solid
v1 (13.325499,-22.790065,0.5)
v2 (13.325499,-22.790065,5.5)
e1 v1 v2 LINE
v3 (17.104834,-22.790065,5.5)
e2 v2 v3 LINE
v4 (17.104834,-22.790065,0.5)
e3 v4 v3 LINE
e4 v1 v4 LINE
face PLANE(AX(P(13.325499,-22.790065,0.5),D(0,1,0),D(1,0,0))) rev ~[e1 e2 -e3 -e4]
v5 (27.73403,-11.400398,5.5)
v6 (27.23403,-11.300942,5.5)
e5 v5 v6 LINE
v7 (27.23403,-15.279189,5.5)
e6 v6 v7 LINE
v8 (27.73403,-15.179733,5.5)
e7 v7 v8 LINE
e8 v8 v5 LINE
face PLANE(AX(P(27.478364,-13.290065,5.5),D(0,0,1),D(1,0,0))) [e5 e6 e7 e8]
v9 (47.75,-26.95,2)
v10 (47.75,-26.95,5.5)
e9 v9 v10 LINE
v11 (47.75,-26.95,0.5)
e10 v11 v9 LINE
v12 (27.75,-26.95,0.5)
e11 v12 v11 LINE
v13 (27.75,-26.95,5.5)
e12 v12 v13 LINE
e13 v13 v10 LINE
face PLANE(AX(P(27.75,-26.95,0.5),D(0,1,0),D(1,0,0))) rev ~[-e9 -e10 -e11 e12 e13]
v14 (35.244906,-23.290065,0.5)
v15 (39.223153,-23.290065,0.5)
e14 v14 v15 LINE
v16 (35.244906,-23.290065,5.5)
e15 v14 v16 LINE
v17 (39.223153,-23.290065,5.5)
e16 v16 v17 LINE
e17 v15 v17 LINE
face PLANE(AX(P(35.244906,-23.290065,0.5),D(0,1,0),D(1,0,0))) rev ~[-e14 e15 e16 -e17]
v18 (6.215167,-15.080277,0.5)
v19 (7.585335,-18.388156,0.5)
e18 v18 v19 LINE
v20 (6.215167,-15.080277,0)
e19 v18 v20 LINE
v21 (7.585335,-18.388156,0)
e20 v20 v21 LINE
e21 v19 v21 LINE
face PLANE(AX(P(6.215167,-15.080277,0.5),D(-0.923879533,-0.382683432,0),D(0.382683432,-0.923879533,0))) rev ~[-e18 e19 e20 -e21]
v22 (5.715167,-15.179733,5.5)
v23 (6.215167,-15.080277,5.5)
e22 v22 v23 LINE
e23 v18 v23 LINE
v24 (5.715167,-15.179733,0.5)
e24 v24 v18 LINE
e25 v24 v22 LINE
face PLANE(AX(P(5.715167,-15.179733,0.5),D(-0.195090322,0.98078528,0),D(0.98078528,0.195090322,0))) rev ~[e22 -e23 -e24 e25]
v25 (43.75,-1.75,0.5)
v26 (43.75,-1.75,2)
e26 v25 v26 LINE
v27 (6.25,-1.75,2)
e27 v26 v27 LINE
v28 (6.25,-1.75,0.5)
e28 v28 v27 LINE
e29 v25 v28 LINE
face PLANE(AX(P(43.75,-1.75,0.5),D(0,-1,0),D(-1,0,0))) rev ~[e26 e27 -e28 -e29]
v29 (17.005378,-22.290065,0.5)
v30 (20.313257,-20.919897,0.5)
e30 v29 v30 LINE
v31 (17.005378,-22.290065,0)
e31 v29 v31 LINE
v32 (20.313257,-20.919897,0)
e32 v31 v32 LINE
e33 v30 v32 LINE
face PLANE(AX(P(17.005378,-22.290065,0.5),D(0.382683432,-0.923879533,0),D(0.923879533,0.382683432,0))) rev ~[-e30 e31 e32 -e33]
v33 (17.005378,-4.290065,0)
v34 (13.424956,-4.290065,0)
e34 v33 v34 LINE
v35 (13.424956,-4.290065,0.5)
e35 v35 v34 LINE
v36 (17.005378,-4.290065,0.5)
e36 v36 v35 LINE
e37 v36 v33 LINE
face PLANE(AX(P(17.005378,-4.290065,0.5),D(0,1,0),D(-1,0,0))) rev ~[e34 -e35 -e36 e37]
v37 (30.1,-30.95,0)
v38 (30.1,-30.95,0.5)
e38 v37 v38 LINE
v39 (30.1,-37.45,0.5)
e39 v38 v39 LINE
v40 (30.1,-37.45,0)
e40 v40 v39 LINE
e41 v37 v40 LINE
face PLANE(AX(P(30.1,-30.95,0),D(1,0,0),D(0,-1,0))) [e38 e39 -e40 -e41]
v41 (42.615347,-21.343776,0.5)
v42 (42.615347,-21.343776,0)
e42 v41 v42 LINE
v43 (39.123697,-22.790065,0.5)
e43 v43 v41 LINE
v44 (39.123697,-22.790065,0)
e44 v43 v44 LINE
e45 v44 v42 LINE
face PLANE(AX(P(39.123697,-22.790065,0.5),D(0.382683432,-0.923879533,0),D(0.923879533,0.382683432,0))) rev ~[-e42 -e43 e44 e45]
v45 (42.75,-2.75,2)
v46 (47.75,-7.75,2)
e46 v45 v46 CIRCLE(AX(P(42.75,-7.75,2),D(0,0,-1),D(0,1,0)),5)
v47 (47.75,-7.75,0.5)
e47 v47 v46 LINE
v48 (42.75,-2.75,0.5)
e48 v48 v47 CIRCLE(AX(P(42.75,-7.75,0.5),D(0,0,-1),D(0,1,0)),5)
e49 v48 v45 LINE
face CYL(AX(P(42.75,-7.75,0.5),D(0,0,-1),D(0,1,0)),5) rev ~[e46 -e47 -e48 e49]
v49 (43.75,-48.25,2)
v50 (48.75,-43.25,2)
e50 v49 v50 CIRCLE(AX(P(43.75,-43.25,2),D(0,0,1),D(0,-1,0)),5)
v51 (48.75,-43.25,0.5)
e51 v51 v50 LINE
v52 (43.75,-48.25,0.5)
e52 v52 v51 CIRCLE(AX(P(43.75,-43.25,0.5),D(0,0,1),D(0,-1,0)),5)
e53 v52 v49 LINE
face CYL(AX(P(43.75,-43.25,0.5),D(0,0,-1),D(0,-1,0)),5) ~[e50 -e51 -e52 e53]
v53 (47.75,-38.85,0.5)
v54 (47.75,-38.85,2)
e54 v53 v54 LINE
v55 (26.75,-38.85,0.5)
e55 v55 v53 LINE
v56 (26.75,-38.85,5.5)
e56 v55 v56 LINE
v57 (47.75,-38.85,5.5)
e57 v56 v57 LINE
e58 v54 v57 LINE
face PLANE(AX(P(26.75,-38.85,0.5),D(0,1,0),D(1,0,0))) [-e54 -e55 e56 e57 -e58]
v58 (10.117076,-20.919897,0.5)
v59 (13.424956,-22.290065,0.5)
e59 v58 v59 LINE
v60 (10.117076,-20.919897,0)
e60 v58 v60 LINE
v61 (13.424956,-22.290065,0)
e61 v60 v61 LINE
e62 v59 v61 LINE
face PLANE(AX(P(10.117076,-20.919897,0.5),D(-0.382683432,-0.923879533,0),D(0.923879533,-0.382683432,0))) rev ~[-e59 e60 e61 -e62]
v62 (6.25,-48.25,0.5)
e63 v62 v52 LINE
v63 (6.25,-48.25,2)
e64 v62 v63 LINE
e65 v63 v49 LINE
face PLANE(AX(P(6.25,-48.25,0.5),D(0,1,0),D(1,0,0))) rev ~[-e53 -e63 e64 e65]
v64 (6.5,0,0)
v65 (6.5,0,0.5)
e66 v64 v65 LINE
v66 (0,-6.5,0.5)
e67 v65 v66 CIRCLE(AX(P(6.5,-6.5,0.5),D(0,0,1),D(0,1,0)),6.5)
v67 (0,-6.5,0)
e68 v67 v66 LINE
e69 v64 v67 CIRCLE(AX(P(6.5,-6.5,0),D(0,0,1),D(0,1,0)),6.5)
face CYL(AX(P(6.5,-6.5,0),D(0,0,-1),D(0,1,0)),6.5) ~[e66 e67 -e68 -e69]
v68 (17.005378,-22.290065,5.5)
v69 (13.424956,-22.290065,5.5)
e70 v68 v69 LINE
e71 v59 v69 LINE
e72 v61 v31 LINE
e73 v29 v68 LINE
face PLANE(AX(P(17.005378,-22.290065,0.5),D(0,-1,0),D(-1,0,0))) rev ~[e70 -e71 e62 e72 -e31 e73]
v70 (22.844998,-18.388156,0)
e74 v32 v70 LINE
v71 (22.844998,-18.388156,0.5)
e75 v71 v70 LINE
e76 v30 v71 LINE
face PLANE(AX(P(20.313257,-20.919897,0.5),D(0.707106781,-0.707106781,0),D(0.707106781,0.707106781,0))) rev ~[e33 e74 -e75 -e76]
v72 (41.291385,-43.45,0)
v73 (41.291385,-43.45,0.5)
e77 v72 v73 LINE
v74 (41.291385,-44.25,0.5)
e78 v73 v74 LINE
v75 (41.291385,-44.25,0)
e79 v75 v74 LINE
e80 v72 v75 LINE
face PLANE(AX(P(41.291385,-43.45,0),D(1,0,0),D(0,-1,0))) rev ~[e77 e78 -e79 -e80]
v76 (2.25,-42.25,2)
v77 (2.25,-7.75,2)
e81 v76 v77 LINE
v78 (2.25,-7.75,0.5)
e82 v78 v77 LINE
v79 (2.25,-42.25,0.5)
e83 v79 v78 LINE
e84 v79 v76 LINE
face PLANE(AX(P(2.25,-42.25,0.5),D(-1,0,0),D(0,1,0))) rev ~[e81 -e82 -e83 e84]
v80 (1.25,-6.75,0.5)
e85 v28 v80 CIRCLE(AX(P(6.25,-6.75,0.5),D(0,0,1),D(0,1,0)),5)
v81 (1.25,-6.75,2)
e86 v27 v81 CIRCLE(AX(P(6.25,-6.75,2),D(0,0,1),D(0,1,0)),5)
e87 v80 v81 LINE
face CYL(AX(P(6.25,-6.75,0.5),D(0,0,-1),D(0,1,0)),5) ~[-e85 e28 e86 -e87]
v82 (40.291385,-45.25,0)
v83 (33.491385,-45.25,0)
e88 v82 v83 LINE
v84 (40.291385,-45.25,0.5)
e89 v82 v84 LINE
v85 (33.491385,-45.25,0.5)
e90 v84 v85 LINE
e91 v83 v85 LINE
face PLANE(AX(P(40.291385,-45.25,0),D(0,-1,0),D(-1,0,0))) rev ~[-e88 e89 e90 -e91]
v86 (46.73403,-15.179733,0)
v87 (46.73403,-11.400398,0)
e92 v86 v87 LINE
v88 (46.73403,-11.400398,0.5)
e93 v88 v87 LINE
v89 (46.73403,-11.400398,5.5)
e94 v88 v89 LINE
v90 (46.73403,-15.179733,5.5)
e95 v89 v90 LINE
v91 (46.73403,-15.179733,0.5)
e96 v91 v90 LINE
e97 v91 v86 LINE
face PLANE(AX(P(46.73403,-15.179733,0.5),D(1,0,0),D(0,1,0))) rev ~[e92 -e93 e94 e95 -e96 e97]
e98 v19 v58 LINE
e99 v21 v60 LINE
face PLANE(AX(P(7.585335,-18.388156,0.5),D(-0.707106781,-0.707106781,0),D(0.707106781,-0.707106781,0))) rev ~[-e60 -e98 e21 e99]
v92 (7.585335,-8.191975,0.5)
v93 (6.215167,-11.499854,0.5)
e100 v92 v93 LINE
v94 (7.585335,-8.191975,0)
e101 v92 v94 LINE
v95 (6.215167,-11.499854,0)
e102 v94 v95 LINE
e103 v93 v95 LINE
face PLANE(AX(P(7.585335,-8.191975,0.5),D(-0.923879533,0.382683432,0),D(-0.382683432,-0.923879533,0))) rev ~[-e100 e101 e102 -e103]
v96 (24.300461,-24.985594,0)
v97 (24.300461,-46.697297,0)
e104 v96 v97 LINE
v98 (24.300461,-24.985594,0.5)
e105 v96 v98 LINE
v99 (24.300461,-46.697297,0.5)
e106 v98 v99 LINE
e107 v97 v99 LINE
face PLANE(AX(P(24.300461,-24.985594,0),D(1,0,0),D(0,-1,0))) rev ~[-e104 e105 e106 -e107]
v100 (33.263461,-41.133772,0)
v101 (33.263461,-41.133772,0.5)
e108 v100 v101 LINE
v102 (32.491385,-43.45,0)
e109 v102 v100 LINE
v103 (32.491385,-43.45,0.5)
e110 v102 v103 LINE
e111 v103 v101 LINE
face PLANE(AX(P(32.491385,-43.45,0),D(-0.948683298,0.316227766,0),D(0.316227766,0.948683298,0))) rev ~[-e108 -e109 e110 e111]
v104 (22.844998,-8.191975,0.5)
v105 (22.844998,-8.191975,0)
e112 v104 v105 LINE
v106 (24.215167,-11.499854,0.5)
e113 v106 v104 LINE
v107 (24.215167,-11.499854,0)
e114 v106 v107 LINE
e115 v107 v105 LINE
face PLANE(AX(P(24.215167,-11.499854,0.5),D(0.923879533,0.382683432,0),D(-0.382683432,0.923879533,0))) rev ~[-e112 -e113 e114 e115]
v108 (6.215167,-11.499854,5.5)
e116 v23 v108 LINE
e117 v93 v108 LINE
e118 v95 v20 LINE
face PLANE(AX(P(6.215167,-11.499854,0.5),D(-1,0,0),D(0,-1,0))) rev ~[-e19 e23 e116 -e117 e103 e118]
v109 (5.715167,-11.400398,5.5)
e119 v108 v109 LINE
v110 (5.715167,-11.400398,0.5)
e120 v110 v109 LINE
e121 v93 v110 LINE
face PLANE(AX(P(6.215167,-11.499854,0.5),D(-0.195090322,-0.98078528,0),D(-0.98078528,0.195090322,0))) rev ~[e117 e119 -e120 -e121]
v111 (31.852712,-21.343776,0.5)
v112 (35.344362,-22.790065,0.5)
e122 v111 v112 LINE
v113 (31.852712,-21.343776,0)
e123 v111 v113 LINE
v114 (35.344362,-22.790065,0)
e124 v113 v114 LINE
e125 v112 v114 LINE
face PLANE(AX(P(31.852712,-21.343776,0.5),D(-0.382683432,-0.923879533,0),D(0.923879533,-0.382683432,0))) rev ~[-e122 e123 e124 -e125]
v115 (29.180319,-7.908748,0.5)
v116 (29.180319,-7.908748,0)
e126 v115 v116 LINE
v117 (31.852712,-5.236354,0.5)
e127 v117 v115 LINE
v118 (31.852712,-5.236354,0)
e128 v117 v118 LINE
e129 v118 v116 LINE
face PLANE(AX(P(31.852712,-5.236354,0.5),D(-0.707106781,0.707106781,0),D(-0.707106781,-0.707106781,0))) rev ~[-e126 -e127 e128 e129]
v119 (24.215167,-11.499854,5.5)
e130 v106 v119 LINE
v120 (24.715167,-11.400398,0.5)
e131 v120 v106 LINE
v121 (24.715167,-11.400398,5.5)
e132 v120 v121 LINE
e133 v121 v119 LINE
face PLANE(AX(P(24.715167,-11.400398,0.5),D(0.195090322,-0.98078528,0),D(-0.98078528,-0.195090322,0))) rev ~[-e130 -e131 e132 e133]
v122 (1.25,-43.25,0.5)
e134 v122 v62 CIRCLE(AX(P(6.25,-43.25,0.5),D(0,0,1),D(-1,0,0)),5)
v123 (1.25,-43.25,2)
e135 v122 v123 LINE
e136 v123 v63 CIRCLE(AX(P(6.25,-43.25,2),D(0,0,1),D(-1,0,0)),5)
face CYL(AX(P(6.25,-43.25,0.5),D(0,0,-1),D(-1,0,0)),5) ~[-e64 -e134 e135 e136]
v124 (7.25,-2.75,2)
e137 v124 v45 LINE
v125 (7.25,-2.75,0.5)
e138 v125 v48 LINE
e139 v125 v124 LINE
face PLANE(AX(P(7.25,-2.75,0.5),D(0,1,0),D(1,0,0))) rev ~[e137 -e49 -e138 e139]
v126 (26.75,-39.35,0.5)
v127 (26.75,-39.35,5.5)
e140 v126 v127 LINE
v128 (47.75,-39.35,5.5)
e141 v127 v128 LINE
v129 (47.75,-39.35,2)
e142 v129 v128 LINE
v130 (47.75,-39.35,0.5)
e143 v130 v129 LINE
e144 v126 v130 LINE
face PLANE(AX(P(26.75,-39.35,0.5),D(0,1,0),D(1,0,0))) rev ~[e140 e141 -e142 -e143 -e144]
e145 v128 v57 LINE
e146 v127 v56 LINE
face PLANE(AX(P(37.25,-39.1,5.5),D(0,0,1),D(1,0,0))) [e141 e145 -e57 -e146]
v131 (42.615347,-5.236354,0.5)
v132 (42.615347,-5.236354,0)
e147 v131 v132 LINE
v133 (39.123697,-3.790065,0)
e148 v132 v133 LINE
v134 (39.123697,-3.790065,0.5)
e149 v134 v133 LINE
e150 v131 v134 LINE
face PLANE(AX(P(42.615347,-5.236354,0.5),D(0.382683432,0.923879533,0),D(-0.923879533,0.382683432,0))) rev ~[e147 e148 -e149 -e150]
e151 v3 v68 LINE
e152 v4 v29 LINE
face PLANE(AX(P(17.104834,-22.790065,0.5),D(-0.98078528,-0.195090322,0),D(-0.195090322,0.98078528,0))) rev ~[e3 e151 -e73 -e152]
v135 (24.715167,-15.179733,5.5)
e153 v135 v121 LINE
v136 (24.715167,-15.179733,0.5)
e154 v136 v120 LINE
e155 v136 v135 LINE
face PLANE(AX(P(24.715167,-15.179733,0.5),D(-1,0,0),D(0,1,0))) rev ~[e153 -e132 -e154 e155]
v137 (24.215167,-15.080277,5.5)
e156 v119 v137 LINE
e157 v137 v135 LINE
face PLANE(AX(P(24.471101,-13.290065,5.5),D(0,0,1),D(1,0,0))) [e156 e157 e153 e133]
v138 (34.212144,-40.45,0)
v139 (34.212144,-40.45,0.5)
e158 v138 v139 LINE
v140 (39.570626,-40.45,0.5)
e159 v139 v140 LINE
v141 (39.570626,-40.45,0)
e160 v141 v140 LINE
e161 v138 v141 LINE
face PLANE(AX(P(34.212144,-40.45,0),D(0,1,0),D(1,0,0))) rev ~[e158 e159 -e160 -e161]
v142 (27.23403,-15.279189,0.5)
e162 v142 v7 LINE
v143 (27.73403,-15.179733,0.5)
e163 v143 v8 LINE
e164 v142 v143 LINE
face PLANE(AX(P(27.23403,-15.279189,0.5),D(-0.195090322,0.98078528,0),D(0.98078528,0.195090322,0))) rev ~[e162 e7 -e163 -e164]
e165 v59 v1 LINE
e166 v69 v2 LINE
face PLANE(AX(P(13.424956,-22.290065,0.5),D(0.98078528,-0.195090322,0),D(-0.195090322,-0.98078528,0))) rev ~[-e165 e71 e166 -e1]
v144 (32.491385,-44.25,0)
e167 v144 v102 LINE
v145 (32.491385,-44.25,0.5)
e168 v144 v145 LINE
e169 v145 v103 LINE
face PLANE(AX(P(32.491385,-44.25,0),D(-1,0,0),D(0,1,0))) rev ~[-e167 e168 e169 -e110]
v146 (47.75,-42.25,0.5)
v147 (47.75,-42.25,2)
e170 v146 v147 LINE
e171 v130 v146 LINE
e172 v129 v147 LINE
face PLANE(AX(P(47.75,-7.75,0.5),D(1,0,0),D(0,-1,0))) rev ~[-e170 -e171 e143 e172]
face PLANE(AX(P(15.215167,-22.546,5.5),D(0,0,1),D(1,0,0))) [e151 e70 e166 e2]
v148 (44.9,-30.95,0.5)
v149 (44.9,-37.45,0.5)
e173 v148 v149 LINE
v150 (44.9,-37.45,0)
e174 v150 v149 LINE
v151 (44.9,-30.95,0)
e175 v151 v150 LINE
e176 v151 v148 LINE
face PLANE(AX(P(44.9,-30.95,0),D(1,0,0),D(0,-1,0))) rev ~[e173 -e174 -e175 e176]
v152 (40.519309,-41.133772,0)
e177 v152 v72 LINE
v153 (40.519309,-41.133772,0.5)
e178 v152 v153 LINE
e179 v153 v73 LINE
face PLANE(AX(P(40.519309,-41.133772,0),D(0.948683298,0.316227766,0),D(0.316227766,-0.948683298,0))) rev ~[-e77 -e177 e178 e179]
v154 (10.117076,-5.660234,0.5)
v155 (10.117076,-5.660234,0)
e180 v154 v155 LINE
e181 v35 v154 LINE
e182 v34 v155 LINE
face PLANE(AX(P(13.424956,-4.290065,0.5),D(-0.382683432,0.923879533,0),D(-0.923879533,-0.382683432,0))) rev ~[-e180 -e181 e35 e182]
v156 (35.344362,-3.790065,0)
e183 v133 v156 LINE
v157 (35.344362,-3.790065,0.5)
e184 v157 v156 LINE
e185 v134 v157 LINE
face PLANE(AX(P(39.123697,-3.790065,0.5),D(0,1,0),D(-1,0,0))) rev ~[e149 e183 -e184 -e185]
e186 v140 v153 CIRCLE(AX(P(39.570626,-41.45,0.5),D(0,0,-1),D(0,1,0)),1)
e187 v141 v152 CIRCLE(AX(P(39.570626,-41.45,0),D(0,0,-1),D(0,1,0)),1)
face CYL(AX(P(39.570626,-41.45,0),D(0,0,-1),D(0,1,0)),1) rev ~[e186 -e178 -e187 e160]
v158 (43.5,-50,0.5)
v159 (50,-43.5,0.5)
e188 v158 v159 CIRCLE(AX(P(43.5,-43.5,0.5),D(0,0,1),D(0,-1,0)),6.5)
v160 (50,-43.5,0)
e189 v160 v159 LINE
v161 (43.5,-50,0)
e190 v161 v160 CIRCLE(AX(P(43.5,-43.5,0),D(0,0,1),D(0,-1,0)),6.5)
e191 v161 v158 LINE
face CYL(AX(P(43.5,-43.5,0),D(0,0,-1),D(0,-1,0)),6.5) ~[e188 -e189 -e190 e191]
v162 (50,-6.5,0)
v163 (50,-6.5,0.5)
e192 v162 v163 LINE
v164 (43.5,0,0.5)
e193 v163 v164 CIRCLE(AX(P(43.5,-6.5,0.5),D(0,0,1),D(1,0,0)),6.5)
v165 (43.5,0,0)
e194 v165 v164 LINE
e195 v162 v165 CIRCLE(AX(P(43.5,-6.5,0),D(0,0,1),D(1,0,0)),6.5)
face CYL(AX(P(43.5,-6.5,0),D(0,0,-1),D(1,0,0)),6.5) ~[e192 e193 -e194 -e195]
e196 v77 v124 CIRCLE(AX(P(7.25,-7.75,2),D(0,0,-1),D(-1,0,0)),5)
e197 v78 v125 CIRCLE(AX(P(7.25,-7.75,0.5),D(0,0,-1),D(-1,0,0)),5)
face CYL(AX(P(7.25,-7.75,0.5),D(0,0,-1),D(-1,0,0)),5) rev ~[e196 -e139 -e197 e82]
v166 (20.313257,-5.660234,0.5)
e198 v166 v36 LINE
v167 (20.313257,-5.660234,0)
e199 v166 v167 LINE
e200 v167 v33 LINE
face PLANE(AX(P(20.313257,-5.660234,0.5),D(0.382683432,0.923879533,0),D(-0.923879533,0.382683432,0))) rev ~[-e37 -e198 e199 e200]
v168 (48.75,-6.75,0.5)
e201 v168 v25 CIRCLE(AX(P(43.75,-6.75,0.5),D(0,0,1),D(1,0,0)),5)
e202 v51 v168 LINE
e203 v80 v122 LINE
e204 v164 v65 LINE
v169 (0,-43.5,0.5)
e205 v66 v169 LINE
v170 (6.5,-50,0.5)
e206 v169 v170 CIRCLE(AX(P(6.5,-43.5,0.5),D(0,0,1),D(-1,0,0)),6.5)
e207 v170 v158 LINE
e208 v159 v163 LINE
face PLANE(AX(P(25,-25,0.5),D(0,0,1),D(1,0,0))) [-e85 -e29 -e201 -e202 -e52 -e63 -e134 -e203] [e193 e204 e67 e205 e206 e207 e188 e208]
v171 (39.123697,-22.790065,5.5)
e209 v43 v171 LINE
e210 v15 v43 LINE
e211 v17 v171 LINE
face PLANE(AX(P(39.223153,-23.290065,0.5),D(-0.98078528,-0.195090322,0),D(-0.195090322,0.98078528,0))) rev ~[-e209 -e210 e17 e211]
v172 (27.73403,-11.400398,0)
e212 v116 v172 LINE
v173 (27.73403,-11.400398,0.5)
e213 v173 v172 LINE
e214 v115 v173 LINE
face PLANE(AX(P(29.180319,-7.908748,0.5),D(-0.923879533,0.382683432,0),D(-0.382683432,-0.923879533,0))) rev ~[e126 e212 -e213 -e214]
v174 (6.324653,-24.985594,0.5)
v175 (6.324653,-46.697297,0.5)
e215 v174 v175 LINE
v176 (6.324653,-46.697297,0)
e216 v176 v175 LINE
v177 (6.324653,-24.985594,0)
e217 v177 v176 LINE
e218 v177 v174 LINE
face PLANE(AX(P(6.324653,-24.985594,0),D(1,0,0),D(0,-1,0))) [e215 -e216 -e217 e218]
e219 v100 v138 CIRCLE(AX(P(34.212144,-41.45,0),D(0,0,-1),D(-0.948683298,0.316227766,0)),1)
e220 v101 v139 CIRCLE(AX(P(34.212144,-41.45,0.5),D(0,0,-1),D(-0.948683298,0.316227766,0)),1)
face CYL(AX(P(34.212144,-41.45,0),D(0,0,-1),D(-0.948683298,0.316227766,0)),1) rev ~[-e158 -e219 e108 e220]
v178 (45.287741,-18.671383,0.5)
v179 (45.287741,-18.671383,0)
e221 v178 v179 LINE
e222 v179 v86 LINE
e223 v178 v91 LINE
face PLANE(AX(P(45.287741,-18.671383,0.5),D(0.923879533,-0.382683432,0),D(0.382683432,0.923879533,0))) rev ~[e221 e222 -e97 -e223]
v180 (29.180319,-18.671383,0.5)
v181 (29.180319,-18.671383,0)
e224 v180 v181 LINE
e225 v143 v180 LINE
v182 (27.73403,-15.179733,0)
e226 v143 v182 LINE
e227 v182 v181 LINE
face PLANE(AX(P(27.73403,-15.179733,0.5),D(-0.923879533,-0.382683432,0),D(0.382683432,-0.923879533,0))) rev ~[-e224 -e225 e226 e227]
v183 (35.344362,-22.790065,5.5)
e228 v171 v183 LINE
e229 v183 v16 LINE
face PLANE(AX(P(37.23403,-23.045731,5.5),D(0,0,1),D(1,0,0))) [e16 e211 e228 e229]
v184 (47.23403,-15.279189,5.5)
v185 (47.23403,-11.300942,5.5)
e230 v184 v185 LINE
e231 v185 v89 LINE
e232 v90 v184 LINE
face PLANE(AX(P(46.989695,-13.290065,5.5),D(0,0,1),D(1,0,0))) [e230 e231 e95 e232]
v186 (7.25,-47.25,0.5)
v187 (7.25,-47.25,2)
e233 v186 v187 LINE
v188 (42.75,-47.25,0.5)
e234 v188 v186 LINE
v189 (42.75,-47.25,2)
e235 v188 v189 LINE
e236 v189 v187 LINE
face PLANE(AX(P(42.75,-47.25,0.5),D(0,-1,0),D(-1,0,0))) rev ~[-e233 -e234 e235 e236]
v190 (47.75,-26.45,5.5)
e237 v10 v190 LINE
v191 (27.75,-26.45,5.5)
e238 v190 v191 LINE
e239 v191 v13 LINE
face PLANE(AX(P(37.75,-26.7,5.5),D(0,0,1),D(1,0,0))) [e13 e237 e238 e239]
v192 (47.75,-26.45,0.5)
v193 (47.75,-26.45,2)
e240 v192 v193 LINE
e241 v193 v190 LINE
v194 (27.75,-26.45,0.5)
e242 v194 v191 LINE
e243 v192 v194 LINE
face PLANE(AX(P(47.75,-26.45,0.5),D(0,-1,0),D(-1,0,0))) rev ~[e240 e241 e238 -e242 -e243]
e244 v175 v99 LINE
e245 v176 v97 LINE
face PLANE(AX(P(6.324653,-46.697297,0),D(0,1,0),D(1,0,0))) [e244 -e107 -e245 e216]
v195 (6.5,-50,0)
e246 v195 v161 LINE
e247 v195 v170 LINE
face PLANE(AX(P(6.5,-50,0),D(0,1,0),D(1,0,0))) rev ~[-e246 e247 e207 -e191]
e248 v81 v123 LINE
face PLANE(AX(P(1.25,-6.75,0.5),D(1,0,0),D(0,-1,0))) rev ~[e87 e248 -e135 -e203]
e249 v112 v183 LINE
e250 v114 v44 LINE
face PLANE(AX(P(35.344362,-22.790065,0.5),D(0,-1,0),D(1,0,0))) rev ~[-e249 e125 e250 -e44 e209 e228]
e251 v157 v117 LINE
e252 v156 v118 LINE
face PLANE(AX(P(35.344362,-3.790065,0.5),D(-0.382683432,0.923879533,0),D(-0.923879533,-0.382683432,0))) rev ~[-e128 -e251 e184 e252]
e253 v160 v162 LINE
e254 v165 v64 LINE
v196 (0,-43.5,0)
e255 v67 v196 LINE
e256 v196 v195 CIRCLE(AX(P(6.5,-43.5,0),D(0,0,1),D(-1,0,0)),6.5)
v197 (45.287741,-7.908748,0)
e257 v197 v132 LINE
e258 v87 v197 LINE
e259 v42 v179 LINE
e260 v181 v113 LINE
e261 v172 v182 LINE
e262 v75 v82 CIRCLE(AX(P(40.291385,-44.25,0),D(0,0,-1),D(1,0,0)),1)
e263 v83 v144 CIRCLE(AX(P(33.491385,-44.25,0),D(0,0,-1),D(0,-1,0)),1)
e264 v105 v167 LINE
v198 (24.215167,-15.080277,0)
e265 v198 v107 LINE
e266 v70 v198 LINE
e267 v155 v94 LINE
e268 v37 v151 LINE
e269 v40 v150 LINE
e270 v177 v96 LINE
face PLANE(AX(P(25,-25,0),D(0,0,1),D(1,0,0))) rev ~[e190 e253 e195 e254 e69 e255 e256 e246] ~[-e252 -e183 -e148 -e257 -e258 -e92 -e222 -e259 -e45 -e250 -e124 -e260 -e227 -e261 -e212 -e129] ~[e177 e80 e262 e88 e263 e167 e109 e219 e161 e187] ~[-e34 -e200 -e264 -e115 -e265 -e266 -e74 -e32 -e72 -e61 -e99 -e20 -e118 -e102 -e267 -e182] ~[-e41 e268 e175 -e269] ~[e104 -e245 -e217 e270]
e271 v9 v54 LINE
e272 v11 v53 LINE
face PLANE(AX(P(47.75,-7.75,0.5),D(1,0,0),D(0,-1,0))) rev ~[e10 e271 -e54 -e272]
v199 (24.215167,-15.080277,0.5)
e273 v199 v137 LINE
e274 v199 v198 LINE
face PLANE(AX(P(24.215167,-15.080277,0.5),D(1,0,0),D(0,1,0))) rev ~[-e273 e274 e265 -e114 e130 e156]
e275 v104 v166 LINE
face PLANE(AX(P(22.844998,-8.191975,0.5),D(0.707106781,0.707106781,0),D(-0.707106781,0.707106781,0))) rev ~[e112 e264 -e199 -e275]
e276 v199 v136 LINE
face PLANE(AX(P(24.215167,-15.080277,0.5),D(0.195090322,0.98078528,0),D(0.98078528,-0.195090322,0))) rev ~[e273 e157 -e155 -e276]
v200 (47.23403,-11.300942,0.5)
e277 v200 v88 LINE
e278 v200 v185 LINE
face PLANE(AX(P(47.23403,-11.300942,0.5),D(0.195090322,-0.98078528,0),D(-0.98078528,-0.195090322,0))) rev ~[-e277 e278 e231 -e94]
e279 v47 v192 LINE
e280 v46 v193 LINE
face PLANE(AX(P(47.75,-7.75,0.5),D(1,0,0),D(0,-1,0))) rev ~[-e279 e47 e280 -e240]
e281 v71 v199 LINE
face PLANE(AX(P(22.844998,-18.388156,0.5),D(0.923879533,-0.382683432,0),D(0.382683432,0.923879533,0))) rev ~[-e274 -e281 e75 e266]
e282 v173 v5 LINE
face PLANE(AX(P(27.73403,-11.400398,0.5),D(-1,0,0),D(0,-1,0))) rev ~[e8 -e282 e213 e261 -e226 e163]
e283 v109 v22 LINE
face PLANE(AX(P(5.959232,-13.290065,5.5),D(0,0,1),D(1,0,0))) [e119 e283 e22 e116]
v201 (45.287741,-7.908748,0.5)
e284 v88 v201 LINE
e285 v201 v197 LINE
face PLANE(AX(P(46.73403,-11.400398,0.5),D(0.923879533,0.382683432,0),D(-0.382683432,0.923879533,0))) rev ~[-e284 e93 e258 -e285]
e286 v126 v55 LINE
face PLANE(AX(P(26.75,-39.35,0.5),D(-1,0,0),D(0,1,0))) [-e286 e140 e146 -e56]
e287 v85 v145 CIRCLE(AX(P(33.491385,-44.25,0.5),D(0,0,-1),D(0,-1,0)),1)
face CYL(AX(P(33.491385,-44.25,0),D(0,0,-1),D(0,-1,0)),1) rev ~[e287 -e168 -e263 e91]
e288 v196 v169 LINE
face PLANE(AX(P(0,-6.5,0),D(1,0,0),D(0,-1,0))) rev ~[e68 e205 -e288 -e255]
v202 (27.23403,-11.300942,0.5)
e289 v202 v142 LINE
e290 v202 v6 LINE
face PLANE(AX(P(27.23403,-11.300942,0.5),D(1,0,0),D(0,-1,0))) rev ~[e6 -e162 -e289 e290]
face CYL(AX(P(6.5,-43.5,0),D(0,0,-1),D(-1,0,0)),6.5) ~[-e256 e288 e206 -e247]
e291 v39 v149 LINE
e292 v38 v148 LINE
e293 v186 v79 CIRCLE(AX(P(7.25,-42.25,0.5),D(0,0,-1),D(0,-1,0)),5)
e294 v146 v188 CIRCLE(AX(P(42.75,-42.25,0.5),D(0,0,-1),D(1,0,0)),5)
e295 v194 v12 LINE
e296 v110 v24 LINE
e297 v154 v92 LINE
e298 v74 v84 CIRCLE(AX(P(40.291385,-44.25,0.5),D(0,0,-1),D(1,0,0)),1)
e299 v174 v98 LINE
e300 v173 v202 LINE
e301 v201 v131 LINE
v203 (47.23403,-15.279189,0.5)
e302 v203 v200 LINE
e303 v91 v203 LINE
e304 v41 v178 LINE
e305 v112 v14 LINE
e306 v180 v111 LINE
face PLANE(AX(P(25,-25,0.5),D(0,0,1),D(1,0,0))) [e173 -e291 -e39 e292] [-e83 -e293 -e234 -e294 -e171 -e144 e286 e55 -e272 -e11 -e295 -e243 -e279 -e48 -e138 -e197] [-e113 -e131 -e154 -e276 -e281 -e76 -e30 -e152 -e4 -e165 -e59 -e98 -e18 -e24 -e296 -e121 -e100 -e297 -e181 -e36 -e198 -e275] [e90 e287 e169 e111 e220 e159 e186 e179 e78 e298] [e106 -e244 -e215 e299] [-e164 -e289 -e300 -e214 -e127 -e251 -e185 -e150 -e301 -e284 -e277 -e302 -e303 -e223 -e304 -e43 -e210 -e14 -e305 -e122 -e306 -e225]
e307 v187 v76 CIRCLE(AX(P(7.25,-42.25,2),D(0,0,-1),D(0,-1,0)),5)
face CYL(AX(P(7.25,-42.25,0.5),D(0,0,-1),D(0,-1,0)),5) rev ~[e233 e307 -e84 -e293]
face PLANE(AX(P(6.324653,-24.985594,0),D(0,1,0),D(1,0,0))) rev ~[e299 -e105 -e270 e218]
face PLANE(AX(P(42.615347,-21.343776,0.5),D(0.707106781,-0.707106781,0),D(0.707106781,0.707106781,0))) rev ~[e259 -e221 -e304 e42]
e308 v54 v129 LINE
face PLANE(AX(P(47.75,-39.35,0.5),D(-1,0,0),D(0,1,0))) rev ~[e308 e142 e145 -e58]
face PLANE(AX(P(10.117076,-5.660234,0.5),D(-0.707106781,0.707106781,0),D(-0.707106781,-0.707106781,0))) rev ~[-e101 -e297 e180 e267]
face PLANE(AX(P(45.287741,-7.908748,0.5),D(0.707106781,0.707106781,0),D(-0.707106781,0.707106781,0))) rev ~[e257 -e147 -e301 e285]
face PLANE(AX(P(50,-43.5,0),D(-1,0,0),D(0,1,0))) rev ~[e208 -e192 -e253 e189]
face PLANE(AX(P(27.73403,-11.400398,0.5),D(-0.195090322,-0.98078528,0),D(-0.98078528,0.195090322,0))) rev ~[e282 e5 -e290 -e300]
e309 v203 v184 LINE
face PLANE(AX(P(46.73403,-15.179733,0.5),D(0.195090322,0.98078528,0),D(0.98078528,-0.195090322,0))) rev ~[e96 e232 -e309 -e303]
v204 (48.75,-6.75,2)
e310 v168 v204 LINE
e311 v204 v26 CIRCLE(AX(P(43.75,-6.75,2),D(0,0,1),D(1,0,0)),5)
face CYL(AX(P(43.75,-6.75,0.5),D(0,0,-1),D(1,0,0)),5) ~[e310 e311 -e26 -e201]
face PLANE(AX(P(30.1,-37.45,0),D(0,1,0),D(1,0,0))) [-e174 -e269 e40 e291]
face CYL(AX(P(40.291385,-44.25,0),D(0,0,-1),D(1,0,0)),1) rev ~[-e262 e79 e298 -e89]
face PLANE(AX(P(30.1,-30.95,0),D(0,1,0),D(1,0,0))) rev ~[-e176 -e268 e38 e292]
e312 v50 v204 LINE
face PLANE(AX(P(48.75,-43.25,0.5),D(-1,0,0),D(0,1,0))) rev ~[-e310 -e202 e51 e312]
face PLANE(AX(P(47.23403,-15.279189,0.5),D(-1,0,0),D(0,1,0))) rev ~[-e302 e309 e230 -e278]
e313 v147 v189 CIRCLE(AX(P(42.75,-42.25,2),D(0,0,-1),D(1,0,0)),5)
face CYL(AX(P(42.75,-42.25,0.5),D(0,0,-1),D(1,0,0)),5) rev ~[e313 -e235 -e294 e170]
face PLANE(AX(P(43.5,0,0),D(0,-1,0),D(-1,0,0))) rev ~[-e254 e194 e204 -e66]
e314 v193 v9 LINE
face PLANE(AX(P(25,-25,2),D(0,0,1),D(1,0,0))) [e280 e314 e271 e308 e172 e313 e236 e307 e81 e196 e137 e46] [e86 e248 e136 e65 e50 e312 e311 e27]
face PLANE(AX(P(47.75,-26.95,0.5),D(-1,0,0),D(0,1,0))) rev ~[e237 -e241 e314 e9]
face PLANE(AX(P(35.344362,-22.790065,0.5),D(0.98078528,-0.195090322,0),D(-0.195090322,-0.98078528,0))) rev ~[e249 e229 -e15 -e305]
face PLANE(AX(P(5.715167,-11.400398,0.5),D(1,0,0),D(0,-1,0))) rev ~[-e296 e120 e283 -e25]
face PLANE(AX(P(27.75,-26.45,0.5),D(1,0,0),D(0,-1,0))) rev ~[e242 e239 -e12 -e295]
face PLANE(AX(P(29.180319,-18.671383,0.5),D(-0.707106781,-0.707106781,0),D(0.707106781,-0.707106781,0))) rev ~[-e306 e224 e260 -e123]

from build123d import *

# Parameters (mm, degrees)
F1_DEPTH  = 0.5
F4_DEPTH  = 1.5
F5_W      = 17.9758077912
F5_H      = 21.7117034923
F5_W_2    = 14.8
F5_H_2    = 6.5
F6_DEPTH  = 0.5
F7_W      = 21
F7_H      = 0.5
F8_DEPTH  = 5
F10_DEPTH = 5
F11_DEPTH = 0.5
F12_DEPTH = 0.5


# Not quite as in the source:
# - a feature names something its author has since deleted; it is built from what else it names


with BuildPart() as f1:
    # F0 (on Top) → F1 (new body)
    with BuildSketch(Plane.XY):
        with BuildLine():
            Line((43.5, 0), (6.5, 0))
            ThreePointArc((6.5, 0), (1.9038059223, -1.9038059223), (0, -6.5))
            Line((0, -6.5), (0, -43.5))
            ThreePointArc((0, -43.5), (1.9038059223, -48.0961940777), (6.5, -50))
            Line((6.5, -50), (43.5, -50))
            ThreePointArc((43.5, -50), (48.0961940777, -48.0961940777), (50, -43.5))
            Line((50, -43.5), (50, -6.5))
            ThreePointArc((50, -6.5), (48.0961940777, -1.9038059223), (43.5, 0))
        make_face()
    extrude(amount=F1_DEPTH)

    # F2 (on face) → F4 (join)
    with BuildSketch(Plane.XY.offset(0.5)):
        with BuildLine():
            Line((43.75, -1.75), (6.25, -1.75))
            ThreePointArc((6.25, -1.75), (2.7144660941, -3.2144660941), (1.25, -6.75))
            Line((1.25, -6.75), (1.25, -43.25))
            ThreePointArc((1.25, -43.25), (2.7144660941, -46.7855339059), (6.25, -48.25))
            Line((6.25, -48.25), (43.75, -48.25))
            ThreePointArc((43.75, -48.25), (47.2855339059, -46.7855339059), (48.75, -43.25))
            Line((48.75, -43.25), (48.75, -6.75))
            ThreePointArc((48.75, -6.75), (47.2855339059, -3.2144660941), (43.75, -1.75))
        make_face()
        with BuildLine():
            ThreePointArc((2.25, -7.75), (3.7144660941, -4.2144660941), (7.25, -2.75))
            Line((7.25, -2.75), (42.75, -2.75))
            ThreePointArc((42.75, -2.75), (46.2855339059, -4.2144660941), (47.75, -7.75))
            Line((47.75, -7.75), (47.75, -42.25))
            ThreePointArc((47.75, -42.25), (46.2855339059, -45.7855339059), (42.75, -47.25))
            Line((42.75, -47.25), (7.25, -47.25))
            ThreePointArc((7.25, -47.25), (3.7144660941, -45.7855339059), (2.25, -42.25))
            Line((2.25, -42.25), (2.25, -7.75))
        make_face(mode=Mode.SUBTRACT)
    extrude(amount=F4_DEPTH)

    # F5 (on face) → F6 (cut, through all)
    with BuildSketch(Plane(origin=(0, 0, 0), x_dir=(1, 0, 0), z_dir=(0, 0, -1))):
        with Locations((15.3125571672, 35.8414453501)):
            Rectangle(F5_W, F5_H)
        with BuildLine():
            Line((40.2913850072, 45.25), (33.4913850072, 45.25))
            ThreePointArc((33.4913850072, 45.25), (32.784278226, 44.9571067812), (32.4913850072, 44.25))
            Line((32.4913850072, 44.25), (32.4913850072, 43.45))
            Line((32.4913850072, 43.45), (33.2634609292, 41.133772234))
            ThreePointArc((33.2634609292, 41.133772234), (33.6274339426, 40.6387578148), (34.2121442272, 40.45))
            Line((34.2121442272, 40.45), (39.5706257871, 40.45))
            ThreePointArc((39.5706257871, 40.45), (40.1553360718, 40.6387578148), (40.5193090852, 41.133772234))
            Line((40.5193090852, 41.133772234), (41.2913850072, 43.45))
            Line((41.2913850072, 43.45), (41.2913850072, 44.25))
            ThreePointArc((41.2913850072, 44.25), (40.9984917884, 44.9571067812), (40.2913850072, 45.25))
        make_face()
        with Locations((37.5, 34.2)):
            Rectangle(F5_W_2, F5_H_2)
    extrude(amount=-F6_DEPTH, mode=Mode.SUBTRACT)

    # F7 (on face) → F8 (join)
    with BuildSketch(Plane.XY.offset(0.5)):
        with Locations((37.25, -39.1)):
            Rectangle(F7_W, F7_H)
        Polygon((37.75, -26.95), (47.75, -26.95), (47.75, -26.45), (27.75, -26.45), (27.75, -26.95), align=None)
    extrude(amount=F8_DEPTH)

    # F9 (on face) → F10 (join)
    with BuildSketch(Plane.XY.offset(0.5)):
        Polygon((46.7340297326, -11.4003978506), (46.7340297326, -15.1797328308), (47.2340297326, -15.2791890145), (47.2340297326, -11.3009416669), align=None)
        Polygon((39.1236972228, -22.7900653407), (35.3443622425, -22.7900653407), (35.2449060588, -23.2900653407), (39.2231534064, -23.2900653407), align=None)
        Polygon((27.2340297326, -15.2791890145), (27.7340297326, -15.1797328308), (27.7340297326, -11.4003978506), (27.2340297326, -11.3009416669), align=None)
        Polygon((17.1048343345, -22.7900653407), (17.0053781508, -22.2900653407), (13.424955538, -22.2900653407), (13.3254993543, -22.7900653407), align=None)
        Polygon((24.2151668444, -11.4998540343), (24.2151668444, -15.0802766471), (24.7151668444, -15.1797328308), (24.7151668444, -11.4003978506), align=None)
        Polygon((5.7151668444, -15.1797328308), (6.2151668444, -15.0802766471), (6.2151668444, -11.4998540343), (5.7151668444, -11.4003978506), align=None)
    extrude(amount=F10_DEPTH)

    # F9 (on face) → F11 (cut, through all)
    with BuildSketch(Plane.XY.offset(0.5)):
        Polygon((27.7340297326, -15.1797328308), (29.1803186149, -18.6713830655), (31.8527120078, -21.3437764584), (35.3443622425, -22.7900653407), (39.1236972228, -22.7900653407), (42.6153474575, -21.3437764584), (45.2877408504, -18.6713830655), (46.7340297326, -15.1797328308), (46.7340297326, -11.4003978506), (45.2877408504, -7.9087476159), (42.6153474575, -5.236354223), (39.1236972228, -3.7900653407), (35.3443622425, -3.7900653407), (31.8527120078, -5.236354223), (29.1803186149, -7.9087476159), (27.7340297326, -11.4003978506), align=None)
    extrude(amount=-F11_DEPTH, mode=Mode.SUBTRACT)

    # F9 (on face) → F12 (cut, through all)
    with BuildSketch(Plane.XY.offset(0.5)):
        Polygon((22.8449984296, -18.3881558169), (24.2151668444, -15.0802766471), (24.2151668444, -11.4998540343), (22.8449984296, -8.1919748645), (20.3132573206, -5.6602337555), (17.0053781508, -4.2900653407), (13.424955538, -4.2900653407), (10.1170763683, -5.6602337555), (7.5853352592, -8.1919748645), (6.2151668444, -11.4998540343), (6.2151668444, -15.0802766471), (7.5853352592, -18.3881558169), (10.1170763683, -20.9198969259), (13.424955538, -22.2900653407), (17.0053781508, -22.2900653407), (20.3132573206, -20.9198969259), align=None)
    extrude(amount=-F12_DEPTH, mode=Mode.SUBTRACT)


solid = f1.part
